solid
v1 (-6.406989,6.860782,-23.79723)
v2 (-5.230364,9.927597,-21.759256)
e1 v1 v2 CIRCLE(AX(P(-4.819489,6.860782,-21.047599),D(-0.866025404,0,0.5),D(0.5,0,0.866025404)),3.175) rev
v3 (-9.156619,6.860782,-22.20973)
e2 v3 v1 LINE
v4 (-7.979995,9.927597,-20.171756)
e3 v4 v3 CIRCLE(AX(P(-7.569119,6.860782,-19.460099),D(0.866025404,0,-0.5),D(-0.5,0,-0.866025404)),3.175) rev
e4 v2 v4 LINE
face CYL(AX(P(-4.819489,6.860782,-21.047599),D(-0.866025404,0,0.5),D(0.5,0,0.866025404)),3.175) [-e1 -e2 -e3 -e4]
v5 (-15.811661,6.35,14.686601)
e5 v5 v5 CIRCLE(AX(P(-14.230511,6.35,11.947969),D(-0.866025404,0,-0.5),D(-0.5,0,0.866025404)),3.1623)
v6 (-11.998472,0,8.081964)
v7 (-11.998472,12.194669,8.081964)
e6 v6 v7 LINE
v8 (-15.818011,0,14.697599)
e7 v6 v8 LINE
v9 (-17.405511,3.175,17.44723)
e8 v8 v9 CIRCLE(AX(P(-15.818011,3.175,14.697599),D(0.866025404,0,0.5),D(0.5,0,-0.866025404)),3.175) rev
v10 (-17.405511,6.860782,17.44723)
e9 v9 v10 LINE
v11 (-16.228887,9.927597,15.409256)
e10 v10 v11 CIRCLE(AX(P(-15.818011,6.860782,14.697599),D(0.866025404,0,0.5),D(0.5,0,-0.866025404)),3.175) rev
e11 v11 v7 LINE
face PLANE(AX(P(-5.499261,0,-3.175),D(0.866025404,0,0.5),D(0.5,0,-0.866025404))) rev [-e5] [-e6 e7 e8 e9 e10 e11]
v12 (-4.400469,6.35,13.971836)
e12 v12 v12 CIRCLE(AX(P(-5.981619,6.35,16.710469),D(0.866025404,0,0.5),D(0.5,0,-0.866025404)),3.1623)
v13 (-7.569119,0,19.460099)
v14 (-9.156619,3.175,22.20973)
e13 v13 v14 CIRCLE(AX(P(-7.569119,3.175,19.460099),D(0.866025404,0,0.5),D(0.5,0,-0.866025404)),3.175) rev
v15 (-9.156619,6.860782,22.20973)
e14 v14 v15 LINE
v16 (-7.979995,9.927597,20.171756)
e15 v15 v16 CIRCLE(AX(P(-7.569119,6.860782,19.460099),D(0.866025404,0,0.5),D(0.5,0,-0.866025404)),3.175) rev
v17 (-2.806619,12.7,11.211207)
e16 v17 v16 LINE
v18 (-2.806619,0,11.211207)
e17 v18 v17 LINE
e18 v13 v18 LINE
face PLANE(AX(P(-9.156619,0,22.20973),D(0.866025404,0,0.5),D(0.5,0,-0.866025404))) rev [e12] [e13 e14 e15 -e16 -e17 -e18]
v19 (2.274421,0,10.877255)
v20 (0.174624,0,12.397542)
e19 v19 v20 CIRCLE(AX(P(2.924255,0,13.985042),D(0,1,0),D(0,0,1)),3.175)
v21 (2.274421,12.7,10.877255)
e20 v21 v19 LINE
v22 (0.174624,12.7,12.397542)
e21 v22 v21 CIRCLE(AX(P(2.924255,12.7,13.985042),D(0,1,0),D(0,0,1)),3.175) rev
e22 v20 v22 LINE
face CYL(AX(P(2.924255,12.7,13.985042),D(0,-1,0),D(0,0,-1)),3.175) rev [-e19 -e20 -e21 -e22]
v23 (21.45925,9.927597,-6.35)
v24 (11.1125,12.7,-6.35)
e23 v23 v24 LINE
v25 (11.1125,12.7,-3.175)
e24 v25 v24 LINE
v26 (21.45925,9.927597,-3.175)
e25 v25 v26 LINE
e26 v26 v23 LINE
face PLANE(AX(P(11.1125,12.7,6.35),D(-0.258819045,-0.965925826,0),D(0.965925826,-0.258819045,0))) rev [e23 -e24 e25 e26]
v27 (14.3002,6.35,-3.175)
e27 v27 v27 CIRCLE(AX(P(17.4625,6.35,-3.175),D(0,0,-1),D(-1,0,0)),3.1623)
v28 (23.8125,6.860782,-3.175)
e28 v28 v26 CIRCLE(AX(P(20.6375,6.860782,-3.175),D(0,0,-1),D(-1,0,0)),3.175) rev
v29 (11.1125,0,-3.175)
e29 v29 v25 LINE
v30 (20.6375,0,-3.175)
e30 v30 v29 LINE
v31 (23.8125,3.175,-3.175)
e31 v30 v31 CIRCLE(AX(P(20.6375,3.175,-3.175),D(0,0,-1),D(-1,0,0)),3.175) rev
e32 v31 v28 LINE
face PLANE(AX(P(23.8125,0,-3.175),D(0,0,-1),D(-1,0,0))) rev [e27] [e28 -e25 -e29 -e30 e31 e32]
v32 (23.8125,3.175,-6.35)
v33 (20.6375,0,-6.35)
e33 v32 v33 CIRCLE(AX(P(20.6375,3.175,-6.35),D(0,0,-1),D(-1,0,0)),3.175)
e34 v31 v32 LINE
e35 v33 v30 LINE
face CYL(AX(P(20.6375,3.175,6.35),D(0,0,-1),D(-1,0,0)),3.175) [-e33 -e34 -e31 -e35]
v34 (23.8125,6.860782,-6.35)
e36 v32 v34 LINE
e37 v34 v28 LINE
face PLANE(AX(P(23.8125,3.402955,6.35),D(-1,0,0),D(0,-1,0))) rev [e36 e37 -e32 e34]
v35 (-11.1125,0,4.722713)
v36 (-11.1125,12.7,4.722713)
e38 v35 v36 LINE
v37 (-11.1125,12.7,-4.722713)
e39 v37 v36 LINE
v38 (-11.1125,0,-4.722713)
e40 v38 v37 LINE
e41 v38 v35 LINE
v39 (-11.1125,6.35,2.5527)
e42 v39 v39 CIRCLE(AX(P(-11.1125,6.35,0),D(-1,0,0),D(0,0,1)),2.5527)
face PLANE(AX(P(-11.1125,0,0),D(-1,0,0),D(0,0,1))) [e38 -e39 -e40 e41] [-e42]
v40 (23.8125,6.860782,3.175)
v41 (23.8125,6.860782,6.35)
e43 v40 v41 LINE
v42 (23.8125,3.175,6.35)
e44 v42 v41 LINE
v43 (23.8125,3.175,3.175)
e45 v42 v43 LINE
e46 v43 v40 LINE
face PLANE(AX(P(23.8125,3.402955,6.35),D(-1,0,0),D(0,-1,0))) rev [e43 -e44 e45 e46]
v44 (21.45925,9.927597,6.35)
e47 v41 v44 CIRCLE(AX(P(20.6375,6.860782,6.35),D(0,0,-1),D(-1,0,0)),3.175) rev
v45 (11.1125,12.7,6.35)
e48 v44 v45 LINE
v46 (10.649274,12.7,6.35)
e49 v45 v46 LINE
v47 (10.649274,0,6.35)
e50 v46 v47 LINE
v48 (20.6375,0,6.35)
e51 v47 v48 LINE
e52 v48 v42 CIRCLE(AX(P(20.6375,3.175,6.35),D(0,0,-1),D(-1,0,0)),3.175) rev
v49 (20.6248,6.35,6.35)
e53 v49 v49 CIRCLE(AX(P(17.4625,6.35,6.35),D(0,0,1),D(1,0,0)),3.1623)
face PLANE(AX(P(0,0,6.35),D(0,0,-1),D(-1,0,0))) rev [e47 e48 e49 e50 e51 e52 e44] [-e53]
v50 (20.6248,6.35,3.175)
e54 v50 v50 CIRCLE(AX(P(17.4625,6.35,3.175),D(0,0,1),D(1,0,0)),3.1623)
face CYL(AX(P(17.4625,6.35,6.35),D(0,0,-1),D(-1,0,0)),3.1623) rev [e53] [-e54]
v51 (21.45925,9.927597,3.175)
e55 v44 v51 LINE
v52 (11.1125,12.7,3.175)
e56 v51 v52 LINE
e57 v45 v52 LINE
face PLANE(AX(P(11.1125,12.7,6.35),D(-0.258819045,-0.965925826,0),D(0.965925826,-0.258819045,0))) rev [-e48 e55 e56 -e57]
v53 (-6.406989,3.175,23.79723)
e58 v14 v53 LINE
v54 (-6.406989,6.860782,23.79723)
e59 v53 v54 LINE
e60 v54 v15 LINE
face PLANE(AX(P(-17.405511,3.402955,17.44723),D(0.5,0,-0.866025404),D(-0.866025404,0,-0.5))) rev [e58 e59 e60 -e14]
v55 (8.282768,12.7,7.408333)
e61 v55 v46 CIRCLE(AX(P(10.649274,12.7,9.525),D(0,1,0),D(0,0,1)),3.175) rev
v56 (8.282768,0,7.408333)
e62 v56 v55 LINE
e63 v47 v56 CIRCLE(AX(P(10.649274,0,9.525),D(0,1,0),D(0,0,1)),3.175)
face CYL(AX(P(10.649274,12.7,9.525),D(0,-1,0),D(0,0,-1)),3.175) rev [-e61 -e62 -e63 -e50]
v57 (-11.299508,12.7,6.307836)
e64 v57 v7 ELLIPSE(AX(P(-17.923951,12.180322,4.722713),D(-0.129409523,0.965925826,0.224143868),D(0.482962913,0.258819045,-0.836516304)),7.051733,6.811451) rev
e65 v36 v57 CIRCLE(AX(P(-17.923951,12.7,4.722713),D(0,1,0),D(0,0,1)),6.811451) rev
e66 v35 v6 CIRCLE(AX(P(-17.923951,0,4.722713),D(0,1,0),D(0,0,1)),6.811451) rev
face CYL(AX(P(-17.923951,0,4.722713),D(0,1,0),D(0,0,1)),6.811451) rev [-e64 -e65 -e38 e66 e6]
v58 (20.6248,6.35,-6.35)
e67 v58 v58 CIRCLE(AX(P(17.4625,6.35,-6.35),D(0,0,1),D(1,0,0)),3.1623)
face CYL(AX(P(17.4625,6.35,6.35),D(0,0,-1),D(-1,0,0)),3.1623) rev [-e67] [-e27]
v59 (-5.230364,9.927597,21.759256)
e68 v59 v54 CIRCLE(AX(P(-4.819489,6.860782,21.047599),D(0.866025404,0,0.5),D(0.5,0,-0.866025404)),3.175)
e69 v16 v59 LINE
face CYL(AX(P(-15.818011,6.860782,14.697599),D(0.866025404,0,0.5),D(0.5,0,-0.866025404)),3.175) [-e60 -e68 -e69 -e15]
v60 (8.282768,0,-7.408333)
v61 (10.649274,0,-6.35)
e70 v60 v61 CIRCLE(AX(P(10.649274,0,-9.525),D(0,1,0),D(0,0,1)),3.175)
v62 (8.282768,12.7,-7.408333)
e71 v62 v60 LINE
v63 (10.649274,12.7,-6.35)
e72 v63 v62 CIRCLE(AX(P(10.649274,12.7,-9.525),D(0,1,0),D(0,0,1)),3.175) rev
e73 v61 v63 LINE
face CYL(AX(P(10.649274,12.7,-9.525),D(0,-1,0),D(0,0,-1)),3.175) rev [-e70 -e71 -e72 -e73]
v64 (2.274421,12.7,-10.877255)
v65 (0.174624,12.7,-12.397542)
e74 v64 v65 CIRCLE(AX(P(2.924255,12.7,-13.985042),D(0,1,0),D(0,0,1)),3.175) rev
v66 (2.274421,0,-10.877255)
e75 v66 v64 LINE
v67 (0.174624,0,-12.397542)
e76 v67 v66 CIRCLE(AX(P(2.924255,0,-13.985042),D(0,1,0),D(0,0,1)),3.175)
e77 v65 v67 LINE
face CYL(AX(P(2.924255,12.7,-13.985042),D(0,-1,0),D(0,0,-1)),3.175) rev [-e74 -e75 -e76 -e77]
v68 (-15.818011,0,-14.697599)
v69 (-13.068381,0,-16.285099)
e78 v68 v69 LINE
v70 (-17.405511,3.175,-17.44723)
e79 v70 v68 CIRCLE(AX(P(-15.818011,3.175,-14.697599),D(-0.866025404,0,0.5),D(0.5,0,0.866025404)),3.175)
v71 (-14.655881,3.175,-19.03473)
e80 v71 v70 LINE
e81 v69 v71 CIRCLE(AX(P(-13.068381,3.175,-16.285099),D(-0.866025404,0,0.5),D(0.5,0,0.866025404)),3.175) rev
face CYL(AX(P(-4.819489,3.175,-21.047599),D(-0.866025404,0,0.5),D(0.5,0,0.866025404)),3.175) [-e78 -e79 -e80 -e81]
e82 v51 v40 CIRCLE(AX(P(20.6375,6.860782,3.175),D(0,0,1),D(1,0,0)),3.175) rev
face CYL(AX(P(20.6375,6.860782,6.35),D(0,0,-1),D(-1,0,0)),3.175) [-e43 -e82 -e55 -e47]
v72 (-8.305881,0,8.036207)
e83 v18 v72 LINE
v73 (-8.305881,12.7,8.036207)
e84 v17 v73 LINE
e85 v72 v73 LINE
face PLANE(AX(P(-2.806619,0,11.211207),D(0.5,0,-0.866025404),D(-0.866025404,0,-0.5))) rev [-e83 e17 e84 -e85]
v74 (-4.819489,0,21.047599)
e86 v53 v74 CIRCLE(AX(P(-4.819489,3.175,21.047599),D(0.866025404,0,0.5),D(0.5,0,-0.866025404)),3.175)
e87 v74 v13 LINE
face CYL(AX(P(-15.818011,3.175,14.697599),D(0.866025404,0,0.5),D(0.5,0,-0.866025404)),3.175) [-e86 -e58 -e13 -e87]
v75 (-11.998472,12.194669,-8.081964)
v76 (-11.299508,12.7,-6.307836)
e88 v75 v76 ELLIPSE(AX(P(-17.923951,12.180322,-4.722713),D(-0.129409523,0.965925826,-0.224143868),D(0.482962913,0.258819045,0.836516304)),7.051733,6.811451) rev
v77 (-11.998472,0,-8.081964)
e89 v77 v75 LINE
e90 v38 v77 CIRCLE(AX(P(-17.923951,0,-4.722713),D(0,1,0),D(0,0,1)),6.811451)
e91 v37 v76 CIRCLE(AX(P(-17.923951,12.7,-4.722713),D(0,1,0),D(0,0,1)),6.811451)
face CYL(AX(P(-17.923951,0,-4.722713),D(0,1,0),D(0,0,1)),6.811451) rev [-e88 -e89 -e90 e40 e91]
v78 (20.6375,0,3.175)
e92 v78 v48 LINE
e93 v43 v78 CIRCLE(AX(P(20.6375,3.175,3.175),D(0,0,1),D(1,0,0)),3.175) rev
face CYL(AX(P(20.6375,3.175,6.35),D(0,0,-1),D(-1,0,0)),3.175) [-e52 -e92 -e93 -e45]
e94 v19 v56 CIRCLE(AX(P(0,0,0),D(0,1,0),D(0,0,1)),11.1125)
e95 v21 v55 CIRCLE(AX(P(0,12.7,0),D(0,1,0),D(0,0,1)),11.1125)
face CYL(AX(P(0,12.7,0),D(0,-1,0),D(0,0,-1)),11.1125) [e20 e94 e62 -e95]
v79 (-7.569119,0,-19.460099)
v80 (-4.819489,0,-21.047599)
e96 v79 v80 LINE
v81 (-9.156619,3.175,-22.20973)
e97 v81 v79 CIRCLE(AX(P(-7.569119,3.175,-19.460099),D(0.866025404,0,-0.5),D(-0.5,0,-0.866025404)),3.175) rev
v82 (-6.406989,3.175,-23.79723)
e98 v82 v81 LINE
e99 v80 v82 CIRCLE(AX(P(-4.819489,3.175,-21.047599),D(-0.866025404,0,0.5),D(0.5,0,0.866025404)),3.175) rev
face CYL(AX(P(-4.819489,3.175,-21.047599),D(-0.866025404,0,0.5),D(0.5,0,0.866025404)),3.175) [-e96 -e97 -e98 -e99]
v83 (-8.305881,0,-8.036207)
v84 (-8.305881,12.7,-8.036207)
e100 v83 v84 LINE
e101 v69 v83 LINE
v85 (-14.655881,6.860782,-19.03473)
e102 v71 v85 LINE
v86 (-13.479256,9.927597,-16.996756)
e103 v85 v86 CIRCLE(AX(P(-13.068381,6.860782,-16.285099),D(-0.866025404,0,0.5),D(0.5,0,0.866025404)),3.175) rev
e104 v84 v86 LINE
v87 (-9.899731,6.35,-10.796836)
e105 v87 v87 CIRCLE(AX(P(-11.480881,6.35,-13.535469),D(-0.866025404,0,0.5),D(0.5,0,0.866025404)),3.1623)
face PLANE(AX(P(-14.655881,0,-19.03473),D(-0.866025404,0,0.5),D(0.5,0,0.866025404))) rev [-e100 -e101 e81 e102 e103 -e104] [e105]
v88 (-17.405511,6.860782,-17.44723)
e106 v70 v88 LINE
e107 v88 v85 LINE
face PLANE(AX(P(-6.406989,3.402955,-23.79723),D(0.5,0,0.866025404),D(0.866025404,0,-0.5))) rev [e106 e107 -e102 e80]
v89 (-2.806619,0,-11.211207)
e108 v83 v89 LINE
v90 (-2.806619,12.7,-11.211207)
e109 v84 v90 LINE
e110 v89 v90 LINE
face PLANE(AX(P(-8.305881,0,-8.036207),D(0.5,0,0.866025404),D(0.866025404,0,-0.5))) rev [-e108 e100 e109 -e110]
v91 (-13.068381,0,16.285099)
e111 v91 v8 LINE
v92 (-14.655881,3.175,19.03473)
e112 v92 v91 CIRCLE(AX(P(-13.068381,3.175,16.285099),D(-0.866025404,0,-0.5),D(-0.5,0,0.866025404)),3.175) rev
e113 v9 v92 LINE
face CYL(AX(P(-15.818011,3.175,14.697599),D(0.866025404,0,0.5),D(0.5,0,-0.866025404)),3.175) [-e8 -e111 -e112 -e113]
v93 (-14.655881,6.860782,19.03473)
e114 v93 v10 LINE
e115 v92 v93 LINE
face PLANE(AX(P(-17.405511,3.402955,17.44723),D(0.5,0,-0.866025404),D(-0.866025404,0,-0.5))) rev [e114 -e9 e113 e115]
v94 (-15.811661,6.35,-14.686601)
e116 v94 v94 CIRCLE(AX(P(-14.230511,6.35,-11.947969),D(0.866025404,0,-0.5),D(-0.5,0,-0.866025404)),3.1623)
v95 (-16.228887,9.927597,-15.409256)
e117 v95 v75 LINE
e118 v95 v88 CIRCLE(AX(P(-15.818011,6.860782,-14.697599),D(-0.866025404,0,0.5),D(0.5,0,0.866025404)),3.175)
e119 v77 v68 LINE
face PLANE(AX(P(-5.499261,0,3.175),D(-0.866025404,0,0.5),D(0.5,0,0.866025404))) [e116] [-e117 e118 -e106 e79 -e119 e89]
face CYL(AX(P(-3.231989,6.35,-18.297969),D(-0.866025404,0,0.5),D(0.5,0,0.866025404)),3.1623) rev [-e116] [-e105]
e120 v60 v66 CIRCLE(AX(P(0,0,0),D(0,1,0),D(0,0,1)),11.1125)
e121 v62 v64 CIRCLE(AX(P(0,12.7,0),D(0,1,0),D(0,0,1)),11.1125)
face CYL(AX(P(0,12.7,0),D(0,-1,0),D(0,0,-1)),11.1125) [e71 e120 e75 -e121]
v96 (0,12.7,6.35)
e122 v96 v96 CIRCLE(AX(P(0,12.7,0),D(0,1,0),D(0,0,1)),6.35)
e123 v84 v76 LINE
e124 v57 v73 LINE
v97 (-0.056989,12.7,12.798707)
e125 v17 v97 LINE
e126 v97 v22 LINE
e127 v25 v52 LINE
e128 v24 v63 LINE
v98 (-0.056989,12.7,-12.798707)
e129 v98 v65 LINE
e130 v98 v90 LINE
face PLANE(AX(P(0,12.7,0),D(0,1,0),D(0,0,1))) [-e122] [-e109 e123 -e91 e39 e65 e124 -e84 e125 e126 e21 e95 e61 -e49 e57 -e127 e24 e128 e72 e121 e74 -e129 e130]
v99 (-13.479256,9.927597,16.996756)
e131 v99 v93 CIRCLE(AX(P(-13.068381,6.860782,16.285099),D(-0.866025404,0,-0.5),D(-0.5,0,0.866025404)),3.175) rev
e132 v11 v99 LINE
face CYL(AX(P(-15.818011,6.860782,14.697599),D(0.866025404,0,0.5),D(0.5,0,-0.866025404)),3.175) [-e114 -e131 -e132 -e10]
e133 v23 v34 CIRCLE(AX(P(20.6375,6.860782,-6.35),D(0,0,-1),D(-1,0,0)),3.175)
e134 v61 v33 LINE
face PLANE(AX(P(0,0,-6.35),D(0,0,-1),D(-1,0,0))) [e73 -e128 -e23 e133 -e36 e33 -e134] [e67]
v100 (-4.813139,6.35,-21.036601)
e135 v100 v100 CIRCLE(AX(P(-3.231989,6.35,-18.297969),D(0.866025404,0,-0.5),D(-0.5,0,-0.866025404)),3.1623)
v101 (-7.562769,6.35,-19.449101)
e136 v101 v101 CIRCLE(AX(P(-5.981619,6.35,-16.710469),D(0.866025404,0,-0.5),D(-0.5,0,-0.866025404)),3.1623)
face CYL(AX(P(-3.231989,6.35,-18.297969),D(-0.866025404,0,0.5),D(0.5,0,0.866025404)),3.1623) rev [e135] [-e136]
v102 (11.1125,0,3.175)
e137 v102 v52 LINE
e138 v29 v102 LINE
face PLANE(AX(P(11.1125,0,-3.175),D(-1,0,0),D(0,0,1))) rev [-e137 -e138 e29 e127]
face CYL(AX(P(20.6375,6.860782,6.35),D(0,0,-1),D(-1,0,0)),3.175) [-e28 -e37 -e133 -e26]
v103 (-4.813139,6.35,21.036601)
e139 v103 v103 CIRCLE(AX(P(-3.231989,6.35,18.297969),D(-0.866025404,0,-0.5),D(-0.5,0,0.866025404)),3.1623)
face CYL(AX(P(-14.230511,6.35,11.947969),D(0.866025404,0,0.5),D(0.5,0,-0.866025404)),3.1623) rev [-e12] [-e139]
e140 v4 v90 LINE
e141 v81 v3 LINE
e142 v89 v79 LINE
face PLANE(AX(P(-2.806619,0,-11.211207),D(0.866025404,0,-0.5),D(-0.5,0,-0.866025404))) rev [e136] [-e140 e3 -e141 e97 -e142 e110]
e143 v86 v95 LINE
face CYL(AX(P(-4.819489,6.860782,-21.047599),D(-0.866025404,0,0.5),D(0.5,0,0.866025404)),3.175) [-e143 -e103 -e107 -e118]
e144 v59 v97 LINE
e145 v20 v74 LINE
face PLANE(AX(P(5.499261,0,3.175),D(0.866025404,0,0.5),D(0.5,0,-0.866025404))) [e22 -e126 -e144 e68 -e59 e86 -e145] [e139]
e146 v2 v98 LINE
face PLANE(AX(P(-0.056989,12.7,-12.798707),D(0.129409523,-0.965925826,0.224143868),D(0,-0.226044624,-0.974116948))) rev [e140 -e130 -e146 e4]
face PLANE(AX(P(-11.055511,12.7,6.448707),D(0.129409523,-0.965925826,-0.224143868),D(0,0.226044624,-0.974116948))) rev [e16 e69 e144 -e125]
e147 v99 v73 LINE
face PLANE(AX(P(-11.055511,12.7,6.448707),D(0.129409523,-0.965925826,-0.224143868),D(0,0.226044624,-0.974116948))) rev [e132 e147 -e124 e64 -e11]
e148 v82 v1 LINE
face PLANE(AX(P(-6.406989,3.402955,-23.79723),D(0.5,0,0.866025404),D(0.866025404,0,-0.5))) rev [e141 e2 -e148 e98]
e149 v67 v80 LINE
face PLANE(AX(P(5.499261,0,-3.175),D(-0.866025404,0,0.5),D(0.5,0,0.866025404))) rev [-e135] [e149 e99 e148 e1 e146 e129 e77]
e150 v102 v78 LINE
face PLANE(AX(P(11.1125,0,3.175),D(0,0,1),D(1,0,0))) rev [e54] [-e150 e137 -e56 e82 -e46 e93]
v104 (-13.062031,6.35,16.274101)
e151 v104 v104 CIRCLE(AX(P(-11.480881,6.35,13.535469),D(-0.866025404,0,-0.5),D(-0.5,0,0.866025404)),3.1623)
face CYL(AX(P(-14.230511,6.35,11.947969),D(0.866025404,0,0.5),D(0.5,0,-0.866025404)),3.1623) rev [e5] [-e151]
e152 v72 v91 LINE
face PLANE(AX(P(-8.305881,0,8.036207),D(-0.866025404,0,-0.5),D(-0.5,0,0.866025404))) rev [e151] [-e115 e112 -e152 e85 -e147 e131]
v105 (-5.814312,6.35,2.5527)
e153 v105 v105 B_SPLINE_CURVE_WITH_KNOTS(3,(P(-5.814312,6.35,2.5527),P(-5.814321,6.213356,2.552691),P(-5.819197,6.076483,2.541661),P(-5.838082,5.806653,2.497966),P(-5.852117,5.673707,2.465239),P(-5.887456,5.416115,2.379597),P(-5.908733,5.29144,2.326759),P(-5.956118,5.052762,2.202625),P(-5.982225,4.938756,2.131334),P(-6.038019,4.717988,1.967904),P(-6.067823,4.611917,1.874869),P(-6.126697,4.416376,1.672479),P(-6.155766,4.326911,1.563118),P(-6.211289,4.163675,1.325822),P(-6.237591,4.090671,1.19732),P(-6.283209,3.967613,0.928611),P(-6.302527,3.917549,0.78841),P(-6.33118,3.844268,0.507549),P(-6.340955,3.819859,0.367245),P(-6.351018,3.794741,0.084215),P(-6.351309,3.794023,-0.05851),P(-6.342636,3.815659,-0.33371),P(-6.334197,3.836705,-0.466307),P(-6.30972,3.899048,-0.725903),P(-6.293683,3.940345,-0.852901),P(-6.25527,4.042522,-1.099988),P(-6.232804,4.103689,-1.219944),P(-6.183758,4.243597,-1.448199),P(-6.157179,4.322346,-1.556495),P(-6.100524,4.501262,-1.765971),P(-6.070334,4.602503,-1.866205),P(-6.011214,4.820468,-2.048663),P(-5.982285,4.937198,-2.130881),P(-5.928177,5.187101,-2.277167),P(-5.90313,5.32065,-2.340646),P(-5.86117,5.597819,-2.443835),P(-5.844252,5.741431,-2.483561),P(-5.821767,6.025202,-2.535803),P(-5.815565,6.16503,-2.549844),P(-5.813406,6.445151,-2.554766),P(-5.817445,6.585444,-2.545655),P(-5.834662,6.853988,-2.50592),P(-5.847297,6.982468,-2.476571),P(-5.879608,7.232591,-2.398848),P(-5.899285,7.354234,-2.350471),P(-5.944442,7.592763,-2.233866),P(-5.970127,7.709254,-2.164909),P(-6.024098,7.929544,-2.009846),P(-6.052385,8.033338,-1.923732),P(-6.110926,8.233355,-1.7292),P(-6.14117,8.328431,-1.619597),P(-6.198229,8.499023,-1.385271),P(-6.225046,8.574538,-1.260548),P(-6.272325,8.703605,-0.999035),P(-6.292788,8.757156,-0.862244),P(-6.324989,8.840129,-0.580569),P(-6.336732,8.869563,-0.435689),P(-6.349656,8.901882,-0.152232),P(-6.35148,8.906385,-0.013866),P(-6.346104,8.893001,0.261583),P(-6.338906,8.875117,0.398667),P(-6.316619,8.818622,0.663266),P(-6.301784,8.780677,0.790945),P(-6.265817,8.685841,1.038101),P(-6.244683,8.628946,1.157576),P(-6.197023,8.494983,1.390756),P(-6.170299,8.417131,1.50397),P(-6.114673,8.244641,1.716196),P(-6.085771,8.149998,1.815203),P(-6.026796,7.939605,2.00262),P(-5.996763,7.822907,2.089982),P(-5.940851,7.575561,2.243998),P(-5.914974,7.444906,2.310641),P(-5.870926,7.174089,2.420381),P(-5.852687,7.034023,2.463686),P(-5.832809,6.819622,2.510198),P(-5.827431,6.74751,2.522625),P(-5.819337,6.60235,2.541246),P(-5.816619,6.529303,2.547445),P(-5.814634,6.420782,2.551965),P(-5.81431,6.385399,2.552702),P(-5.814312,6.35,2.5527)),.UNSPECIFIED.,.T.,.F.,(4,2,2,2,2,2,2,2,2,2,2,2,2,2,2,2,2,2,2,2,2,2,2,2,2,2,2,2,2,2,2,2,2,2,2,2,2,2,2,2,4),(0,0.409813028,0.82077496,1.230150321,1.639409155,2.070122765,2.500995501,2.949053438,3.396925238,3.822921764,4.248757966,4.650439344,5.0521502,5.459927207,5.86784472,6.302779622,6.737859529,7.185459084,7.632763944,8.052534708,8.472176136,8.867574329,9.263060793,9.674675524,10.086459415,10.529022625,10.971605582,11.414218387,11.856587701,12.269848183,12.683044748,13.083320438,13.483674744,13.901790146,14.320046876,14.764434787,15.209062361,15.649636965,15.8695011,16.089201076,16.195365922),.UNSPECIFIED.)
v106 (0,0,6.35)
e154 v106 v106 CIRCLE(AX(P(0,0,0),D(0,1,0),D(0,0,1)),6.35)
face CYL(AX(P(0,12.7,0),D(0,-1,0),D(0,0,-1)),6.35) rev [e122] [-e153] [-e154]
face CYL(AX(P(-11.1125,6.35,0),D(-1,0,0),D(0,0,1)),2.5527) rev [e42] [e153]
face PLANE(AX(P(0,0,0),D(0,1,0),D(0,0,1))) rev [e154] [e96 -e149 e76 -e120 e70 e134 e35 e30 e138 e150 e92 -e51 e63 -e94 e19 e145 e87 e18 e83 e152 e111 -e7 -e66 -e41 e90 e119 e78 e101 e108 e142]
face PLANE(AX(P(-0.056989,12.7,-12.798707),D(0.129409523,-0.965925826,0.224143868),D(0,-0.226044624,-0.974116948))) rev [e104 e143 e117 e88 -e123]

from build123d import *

# Parameters (mm, degrees)
SKETCH1_R                             = 11.1125
SKETCH1_R_2                           = 6.35
BOSS_EXTRUDE1_DEPTH                   = 12.7
SKETCH4_R                             = 3.1623
BOSS_EXTRUDE2_DEPTH                   = 6.35
SKETCH5_W                             = 12.7
SKETCH5_H                             = 6.35
CUT_EXTRUDE1_DEPTH                    = 30.185832393
CIRPATTERN1_COUNT                     = 3
FILLET2_R                             = 3.175
BOSS_EXTRUDE3_START                   = -12.7
BOSS_EXTRUDE3_DEPTH                   = 12.7
CUT_EXTRUDE2_REACH                    = 43.809
CUT_EXTRUDE3_DEPTH                    = 42.808737587
CUT_EXTRUDE3_DEPTH_BACK               = 42.808737587
TAPPED_HOLE_FOR_10_32_HELICOIL1_D     = 5.1054
TAPPED_HOLE_FOR_10_32_HELICOIL1_DEPTH = 11.9888
TAPPED_HOLE_FOR_10_32_HELICOIL1_TIP   = 1.533816902


# Read off the part's stored shape, not the designer's step: Boss-Extrude3
with BuildPart() as part:
    # Sketch1 → Boss-Extrude1 (new body)
    with BuildSketch(Plane(origin=(0, 0, 0), x_dir=(1, 0, 0), z_dir=(0, 1, 0))):
        with Locations(Location((0, 0, 0), (0, 0, 270))):
            Circle(SKETCH1_R)
        with Locations(Location((0, 0, 0), (0, 0, 270))):
            Circle(SKETCH1_R_2, mode=Mode.SUBTRACT)
    extrude(amount=BOSS_EXTRUDE1_DEPTH)

    # Sketch4 → Boss-Extrude2 (add, symmetric)
    with BuildSketch(Plane.XY):
        Polygon((11.1125, 12.7), (23.8125, 9.297045256), (23.8125, 3.402954744), (23.8125, 0), (11.1125, 0), (8.73125, 0), (8.73125, 12.7), align=None)
        with Locations((17.4625, 6.35)):
            Circle(SKETCH4_R, mode=Mode.SUBTRACT)
    boss_extrude2 = extrude(amount=BOSS_EXTRUDE2_DEPTH, both=True)

    # Sketch5 → Cut-Extrude1 (cut, through all)
    with BuildSketch(Plane(origin=(0, 12.7, 0), x_dir=(1, 0, 0), z_dir=(0, 1, 0))):
        with Locations((17.4625, 0)):
            Rectangle(SKETCH5_W, SKETCH5_H)
    cut_extrude1 = extrude(amount=-CUT_EXTRUDE1_DEPTH, mode=Mode.SUBTRACT)

    # CirPattern1: Boss-Extrude2, Cut-Extrude1 ×3 about axis
    cirpattern1_axis = Axis((0, 0, 0), (0, 1, 0))
    add([boss_extrude2.rotate(cirpattern1_axis, i * 360 / CIRPATTERN1_COUNT) for i in range(1, CIRPATTERN1_COUNT)])
    add([cut_extrude1.rotate(cirpattern1_axis, i * 360 / CIRPATTERN1_COUNT) for i in range(1, CIRPATTERN1_COUNT)], mode=Mode.SUBTRACT)

    # Fillet2
    fillet2_edges = [part.edges().sort_by_distance(p)[0] for p in [
        (9.119493201, 6.35, -6.35),
        (9.119493201, 6.35, 6.35),
        (-16.030695986, 9.297045256, -18.240979928),
        (-16.030695986, 0, -18.240979928),
        (-7.781804014, 9.297045256, 23.003479928),
        (-7.781804014, 0, 23.003479928),
        (23.8125, 9.297045256, 4.7625),
        (23.8125, 0, 4.7625),
        (23.8125, 9.297045256, -4.7625),
        (23.8125, 0, -4.7625),
        (0.939514713, 6.35, 11.072712782),
        (-16.030695986, 9.297045256, 18.240979928),
        (-16.030695986, 0, 18.240979928),
        (0.939514713, 6.35, -11.072712782),
        (-7.781804014, 9.297045256, -23.003479928),
        (-7.781804014, 0, -23.003479928),
    ]]
    fillet(fillet2_edges, radius=FILLET2_R)

    # Boss-Extrude3 outline → Boss-Extrude3 (add)
    with BuildSketch(Plane(origin=(0, 12.7, 0), x_dir=(1, 0, 0), z_dir=(0, 1, 0)).offset(BOSS_EXTRUDE3_START)):
        with BuildLine():
            ThreePointArc((-10.059007915, -4.722712782), (-10.845929691, -2.419393601), (-11.1125, 0))
            Line((-11.1125, 0), (-11.1125, -4.722712782))
            ThreePointArc((-11.1125, -4.722712782), (-11.337716442, -6.459773203), (-11.99847248, -8.081963948))
            Line((-11.99847248, -8.081963948), (-11.055511314, -6.4487073))
            Line((-11.055511314, -6.4487073), (-10.059007915, -4.722712782))
        make_face()
        with BuildLine():
            Line((-11.055511314, 6.4487073), (-11.99847248, 8.081963948))
            ThreePointArc((-11.99847248, 8.081963948), (-11.337716442, 6.459773203), (-11.1125, 4.722712782))
            Line((-11.1125, 4.722712782), (-11.1125, 0))
            ThreePointArc((-11.1125, 0), (-10.845929691, 2.419393601), (-10.059007915, 4.722712782))
            Line((-10.059007915, 4.722712782), (-11.055511314, 6.4487073))
        make_face()
    extrude(amount=BOSS_EXTRUDE3_DEPTH)

    # Sketch9 → Cut-Extrude2 (cut, up to next)
    with BuildSketch(Plane(origin=(-5.499261314, 0, -3.175), x_dir=(-0.500000000000004, 0, 0.8660254037844364), z_dir=(-0.8660254037844365, 0, -0.500000000000004)), mode=Mode.PRIVATE) as cut_extrude2_sk1:
        Polygon((11.1125, 12.7), (12.998422331, 12.194668634), (12.998422331, 12.7), align=None)
    cut_extrude2_tool1 = extrude(cut_extrude2_sk1.sketch, amount=CUT_EXTRUDE2_REACH, mode=Mode.PRIVATE) & part.part
    add(cut_extrude2_tool1.solids().sort_by_distance((-11.684152, 12.531556, 7.537545))[0], mode=Mode.SUBTRACT)

    # Sketch10 → Cut-Extrude3 (cut, two sides: drawn at the far end of the back side and taken through both)
    with BuildSketch(Plane(origin=(-5.499261314, 0, 3.175), x_dir=(0.49999999999999195, 0, 0.8660254037844434), z_dir=(-0.8660254037844434, 0, 0.49999999999999195)).offset(-CUT_EXTRUDE3_DEPTH_BACK)):
        Polygon((-12.998422331, 117.204706423), (-12.998422331, 12.7), (-12.998422331, 12.194668634), (-11.1125, 12.7), (89.831294903, 39.747808325), (215.584349787, 206.694218426), (112.754632553, 284.151116524), align=None)
    extrude(amount=CUT_EXTRUDE3_DEPTH + CUT_EXTRUDE3_DEPTH_BACK, mode=Mode.SUBTRACT)

    # Tapped Hole for #10-32 Helicoil1
    with Locations(Plane.ZY.offset(11.1125)):
        with Locations((0, 6.35)):
            Hole(TAPPED_HOLE_FOR_10_32_HELICOIL1_D / 2, depth=TAPPED_HOLE_FOR_10_32_HELICOIL1_DEPTH)
            with Locations((0, 0, -(TAPPED_HOLE_FOR_10_32_HELICOIL1_DEPTH + TAPPED_HOLE_FOR_10_32_HELICOIL1_TIP / 2))):  # 118° drill point
                Cone(0, TAPPED_HOLE_FOR_10_32_HELICOIL1_D / 2, TAPPED_HOLE_FOR_10_32_HELICOIL1_TIP, mode=Mode.SUBTRACT)


solid = part.part
